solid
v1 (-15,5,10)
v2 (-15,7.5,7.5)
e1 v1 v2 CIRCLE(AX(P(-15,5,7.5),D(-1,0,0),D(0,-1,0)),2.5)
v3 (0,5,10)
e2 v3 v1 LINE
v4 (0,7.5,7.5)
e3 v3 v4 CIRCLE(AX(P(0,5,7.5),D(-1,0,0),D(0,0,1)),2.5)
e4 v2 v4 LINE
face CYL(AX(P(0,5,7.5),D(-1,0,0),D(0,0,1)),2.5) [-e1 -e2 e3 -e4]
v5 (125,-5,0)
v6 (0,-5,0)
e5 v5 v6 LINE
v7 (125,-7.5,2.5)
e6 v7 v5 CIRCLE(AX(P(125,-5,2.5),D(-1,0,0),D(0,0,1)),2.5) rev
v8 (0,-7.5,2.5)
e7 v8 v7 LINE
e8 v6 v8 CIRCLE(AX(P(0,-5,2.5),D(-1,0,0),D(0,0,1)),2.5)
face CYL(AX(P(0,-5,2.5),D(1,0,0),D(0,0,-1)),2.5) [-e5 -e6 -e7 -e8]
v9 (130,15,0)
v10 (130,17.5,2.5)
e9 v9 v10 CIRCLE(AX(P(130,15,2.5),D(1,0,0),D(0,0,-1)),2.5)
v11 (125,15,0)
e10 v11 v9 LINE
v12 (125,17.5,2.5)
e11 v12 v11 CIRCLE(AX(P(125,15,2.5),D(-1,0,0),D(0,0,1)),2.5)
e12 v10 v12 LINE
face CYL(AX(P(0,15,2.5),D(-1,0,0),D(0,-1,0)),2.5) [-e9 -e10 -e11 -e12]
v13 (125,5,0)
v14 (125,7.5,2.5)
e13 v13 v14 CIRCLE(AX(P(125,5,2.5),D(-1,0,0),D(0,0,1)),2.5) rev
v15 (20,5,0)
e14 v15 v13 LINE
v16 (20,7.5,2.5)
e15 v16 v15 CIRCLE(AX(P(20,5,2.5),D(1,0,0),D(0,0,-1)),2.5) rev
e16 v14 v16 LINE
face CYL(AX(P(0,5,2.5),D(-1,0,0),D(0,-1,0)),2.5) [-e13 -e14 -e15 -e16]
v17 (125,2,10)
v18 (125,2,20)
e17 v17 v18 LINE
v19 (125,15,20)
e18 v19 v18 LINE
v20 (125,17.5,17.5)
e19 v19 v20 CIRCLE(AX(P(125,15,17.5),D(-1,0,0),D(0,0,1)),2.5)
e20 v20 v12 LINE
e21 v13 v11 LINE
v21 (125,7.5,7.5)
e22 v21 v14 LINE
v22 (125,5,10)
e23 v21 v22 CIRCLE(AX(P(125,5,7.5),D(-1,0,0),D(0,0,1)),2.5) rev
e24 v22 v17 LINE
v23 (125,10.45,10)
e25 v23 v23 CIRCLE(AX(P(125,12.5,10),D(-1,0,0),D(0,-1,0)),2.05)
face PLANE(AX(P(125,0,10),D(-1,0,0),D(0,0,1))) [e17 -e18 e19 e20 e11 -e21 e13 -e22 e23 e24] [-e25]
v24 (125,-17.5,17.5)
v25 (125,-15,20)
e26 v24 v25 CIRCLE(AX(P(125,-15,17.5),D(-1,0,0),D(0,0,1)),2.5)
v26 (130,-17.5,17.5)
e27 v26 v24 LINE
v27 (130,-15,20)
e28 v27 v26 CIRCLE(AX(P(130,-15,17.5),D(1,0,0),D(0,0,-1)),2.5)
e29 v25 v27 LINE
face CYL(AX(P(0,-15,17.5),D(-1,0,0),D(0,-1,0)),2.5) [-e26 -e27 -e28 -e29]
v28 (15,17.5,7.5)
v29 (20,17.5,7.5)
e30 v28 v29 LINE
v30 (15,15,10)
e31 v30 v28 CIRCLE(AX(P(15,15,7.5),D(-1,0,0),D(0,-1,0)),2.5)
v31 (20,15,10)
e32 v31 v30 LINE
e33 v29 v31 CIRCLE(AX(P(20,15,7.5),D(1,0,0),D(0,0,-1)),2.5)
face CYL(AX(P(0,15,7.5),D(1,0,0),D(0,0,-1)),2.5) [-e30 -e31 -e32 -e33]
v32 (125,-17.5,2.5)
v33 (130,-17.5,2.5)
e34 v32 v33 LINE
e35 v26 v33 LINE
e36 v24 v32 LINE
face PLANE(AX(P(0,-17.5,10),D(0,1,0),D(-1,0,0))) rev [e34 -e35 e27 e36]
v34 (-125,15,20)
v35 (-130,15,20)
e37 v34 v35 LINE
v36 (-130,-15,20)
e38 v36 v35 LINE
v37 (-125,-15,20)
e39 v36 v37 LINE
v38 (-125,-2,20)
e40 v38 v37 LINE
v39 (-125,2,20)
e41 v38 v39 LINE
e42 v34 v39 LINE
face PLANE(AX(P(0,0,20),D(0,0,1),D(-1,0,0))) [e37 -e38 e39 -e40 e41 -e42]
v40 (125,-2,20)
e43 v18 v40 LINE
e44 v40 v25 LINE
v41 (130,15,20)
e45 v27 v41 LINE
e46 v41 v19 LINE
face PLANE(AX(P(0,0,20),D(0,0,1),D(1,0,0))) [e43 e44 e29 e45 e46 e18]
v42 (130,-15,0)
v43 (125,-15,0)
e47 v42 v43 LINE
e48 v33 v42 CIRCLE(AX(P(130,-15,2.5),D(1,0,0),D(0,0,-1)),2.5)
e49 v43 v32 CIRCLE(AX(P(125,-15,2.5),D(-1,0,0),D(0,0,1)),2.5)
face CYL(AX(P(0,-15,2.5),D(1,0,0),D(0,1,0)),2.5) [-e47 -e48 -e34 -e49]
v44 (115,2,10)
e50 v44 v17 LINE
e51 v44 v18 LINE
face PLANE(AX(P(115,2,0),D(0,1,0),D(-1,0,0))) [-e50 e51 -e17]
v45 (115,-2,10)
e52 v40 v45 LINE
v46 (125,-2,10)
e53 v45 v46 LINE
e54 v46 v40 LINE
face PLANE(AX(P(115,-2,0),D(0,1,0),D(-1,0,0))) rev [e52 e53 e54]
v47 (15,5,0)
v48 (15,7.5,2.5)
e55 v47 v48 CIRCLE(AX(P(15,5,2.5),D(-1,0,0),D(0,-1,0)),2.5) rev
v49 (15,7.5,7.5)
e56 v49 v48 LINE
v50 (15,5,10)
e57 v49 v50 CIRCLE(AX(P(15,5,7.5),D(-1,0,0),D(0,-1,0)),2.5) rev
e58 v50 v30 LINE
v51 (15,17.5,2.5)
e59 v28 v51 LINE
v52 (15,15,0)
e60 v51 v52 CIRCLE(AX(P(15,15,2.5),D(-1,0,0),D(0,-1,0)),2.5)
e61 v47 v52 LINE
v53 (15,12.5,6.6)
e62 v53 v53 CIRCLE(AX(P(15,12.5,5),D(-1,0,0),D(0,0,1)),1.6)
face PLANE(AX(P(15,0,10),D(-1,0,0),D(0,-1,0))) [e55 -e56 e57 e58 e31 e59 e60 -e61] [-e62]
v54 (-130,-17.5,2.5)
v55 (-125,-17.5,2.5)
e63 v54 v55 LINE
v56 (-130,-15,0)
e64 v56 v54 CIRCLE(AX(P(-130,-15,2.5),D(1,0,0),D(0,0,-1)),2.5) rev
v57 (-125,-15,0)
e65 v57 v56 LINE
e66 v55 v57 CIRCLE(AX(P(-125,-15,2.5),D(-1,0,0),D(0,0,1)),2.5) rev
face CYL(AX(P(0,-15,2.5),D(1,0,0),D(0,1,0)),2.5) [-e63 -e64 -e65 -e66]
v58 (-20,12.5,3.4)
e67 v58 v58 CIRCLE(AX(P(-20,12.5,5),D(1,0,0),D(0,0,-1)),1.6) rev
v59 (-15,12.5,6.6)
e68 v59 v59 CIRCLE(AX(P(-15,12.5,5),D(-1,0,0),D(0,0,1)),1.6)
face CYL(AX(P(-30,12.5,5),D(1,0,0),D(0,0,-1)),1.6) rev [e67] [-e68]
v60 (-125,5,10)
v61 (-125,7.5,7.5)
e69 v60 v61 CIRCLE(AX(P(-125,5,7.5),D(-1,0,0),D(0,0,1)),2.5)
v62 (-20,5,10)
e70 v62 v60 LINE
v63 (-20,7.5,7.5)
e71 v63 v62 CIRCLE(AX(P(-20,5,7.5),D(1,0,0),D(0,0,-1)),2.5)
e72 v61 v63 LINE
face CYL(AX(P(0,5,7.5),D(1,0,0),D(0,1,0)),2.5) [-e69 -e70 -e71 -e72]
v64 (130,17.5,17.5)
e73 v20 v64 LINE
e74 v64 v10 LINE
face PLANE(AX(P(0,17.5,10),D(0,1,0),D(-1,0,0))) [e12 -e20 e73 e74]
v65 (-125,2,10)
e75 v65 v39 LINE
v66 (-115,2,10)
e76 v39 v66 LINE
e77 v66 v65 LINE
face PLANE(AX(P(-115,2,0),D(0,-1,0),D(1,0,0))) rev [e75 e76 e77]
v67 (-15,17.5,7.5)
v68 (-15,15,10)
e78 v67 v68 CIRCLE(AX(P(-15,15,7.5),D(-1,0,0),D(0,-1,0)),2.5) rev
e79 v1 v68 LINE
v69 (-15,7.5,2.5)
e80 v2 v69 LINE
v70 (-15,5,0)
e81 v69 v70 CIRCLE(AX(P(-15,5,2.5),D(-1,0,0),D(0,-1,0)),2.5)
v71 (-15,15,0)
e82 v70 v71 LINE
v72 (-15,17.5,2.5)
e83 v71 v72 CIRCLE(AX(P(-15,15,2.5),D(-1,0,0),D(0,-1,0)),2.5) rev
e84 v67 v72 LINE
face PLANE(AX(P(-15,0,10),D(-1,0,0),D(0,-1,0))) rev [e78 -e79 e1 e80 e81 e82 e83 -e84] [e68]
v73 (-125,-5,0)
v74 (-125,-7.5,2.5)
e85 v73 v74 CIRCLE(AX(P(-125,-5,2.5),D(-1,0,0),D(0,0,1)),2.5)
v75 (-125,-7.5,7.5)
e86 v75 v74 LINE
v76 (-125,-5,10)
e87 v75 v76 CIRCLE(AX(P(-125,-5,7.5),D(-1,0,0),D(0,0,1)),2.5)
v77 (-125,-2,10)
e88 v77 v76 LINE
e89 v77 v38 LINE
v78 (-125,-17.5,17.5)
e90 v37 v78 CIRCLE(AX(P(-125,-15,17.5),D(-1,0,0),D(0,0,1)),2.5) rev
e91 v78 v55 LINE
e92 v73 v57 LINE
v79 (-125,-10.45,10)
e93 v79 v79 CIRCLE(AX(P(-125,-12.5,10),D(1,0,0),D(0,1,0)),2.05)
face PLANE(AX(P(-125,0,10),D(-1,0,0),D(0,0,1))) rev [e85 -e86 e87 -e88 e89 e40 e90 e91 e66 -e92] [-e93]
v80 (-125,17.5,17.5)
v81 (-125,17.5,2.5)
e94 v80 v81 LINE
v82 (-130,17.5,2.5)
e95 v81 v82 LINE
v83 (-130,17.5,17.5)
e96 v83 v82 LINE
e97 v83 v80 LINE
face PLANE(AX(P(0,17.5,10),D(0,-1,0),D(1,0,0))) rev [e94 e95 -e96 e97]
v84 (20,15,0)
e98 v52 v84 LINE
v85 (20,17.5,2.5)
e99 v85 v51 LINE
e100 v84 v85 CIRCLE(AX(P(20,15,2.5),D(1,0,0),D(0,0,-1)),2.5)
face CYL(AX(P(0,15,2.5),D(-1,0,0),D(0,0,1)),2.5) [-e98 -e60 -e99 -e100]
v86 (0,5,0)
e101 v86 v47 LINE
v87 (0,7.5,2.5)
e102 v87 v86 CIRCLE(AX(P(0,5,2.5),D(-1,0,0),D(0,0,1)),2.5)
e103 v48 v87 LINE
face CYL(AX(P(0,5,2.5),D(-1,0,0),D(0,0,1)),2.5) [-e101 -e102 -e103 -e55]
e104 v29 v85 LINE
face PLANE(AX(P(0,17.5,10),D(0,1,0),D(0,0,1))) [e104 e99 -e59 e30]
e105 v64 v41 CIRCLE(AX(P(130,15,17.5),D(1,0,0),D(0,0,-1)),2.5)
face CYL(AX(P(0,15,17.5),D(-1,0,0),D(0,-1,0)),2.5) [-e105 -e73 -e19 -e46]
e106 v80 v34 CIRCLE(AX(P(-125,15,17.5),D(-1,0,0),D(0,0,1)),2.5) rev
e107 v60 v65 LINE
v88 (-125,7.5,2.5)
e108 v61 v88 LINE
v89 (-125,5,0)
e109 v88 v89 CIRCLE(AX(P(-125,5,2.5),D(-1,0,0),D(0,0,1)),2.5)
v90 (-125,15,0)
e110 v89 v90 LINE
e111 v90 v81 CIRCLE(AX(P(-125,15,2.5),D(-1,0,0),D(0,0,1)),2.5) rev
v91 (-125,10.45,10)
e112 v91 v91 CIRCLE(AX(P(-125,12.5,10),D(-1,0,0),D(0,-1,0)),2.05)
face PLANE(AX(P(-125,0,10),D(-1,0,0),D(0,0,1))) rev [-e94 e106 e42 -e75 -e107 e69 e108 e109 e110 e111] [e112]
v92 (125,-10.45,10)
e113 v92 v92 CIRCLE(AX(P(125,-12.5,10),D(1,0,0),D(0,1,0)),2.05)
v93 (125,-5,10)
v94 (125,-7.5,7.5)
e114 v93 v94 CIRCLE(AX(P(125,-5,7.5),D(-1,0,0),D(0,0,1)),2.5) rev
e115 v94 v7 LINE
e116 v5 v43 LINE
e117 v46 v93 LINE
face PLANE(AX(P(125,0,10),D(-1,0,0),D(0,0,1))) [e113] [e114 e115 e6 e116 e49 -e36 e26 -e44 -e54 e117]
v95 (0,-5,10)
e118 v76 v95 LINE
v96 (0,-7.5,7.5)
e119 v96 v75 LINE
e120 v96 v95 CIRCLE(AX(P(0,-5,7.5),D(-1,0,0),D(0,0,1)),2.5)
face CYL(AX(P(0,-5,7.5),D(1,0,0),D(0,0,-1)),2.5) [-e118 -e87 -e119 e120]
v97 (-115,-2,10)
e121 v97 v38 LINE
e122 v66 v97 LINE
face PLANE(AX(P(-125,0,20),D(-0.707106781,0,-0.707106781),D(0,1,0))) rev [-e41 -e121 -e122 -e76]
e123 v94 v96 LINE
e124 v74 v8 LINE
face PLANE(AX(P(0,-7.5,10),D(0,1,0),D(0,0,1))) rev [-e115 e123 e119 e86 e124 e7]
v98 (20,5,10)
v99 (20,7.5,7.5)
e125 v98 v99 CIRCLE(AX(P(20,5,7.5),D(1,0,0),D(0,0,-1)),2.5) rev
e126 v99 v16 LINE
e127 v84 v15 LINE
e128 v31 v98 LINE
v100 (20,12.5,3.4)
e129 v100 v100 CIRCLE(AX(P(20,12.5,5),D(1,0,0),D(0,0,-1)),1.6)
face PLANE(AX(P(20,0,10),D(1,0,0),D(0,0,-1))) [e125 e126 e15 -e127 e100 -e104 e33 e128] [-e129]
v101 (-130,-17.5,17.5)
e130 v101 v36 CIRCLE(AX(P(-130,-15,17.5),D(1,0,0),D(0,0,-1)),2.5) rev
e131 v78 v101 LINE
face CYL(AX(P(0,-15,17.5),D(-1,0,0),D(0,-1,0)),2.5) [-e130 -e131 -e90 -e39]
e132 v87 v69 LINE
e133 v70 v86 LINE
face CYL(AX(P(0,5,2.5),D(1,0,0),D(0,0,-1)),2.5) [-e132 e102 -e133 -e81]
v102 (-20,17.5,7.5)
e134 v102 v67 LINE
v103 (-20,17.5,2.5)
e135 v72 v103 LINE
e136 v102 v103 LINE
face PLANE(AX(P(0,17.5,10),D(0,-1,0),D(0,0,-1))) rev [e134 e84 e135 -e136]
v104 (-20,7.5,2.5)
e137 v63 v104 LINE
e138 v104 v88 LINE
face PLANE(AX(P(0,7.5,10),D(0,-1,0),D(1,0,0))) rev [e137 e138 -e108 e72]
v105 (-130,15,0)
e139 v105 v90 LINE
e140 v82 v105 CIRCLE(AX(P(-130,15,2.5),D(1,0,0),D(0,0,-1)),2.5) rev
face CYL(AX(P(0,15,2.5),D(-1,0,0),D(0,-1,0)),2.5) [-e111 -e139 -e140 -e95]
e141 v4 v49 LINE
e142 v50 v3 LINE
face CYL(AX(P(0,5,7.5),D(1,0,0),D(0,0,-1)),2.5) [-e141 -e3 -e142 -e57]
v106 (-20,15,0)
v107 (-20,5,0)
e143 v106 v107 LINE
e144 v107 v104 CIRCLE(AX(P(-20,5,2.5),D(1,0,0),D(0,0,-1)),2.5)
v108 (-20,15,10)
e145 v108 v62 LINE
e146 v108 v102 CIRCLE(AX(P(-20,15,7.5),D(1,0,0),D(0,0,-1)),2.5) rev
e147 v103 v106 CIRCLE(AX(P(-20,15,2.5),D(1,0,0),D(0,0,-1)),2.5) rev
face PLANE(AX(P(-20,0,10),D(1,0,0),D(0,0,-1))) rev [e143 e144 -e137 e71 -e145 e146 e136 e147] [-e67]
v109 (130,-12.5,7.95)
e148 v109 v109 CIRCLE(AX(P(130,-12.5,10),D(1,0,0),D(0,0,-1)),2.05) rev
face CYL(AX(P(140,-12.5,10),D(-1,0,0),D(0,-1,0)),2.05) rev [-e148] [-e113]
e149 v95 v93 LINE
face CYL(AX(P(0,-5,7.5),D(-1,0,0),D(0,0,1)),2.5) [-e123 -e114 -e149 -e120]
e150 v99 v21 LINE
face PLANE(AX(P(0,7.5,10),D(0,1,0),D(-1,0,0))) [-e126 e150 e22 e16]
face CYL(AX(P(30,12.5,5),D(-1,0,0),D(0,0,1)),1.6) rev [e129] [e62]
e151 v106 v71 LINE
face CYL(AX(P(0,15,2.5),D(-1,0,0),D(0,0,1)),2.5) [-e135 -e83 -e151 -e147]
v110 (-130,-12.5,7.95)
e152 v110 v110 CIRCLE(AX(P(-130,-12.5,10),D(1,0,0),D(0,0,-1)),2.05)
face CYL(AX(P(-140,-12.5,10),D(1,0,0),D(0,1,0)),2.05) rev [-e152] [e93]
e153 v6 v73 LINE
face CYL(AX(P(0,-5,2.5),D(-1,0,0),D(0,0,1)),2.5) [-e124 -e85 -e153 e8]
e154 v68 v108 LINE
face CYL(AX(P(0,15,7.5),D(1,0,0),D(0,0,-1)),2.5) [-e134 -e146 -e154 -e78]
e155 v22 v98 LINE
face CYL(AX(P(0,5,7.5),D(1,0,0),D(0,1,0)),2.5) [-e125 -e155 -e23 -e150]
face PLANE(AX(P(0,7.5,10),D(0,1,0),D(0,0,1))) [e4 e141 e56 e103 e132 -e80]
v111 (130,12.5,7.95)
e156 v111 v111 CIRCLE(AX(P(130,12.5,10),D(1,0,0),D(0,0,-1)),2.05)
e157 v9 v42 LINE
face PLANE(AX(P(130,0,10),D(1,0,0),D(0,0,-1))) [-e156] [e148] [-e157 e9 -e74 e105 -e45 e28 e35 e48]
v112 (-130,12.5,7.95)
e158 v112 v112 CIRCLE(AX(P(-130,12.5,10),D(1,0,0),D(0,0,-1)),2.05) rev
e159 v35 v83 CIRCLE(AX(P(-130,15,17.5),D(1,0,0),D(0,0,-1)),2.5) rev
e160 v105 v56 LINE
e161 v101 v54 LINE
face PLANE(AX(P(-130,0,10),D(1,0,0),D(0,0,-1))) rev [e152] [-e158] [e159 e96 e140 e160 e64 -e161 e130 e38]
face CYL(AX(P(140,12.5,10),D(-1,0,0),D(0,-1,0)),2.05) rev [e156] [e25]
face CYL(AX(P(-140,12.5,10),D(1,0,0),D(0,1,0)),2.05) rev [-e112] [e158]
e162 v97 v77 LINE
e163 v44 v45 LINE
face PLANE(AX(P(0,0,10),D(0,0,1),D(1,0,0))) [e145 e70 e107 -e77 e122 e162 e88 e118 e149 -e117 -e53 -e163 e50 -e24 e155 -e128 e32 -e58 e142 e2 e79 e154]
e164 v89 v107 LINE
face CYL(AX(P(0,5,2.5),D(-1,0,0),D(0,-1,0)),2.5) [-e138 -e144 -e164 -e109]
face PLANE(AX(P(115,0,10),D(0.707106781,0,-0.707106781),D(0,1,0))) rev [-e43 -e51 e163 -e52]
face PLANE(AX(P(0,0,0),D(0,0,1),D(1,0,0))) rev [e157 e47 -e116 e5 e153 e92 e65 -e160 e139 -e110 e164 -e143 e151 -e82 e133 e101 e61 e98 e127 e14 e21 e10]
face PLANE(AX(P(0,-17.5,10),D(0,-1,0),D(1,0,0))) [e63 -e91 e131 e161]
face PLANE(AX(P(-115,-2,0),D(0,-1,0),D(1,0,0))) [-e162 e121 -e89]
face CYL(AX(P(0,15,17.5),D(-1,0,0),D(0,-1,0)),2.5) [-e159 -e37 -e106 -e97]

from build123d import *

# Parameters (mm, degrees)
BOSS_EXTRU_1_DEPTH           = 10
BOSS_EXTRU_2_DEPTH           = 10
ESQUISSE4_R                  = 1.6
ENL_V_MAT_EXTRU_1_DEPTH      = 15
ESQUISSE5_R                  = 2.05
ENL_V_MAT_EXTRU_2_DEPTH      = 15
CONG_1_R                     = 2.5
ESQUISSE6_W                  = 10
ESQUISSE6_H                  = 2
BOSS_EXTRU_3_DEPTH           = 10
CHANFREIN1_SIZE              = 10
CONG_1_OF_SYM_TRIE1_R        = 2.5
CHANFREIN1_OF_SYM_TRIE1_SIZE = 10


with BuildPart() as part:
    # Esquisse2 → Boss.-Extru.1 (new body)
    with BuildSketch(Plane.XY):
        Polygon((125, 17.5), (125, 7.5), (20, 7.5), (20, 17.5), (15, 17.5), (15, 7.5), (0, 7.5), (0, -7.5), (125, -7.5), (125, -17.5), (130, -17.5), (130, 17.5), align=None)
    boss_extru_1 = extrude(amount=BOSS_EXTRU_1_DEPTH)

    # Esquisse3 → Boss.-Extru.2 (add)
    with BuildSketch(Plane.XY.offset(10)):
        Polygon((125, 7.5), (125, -7.5), (125, -17.5), (130, -17.5), (130, 17.5), (125, 17.5), align=None)
    boss_extru_2 = extrude(amount=BOSS_EXTRU_2_DEPTH)

    # Esquisse4 → Enlèv. mat.-Extru.1 (cut)
    with BuildSketch(Plane.ZY.offset(-15)):
        with Locations((5, 12.5)):
            Circle(ESQUISSE4_R)
    enl_v_mat_extru_1 = extrude(amount=-ENL_V_MAT_EXTRU_1_DEPTH, mode=Mode.SUBTRACT)

    # Esquisse5 → Enlèv. mat.-Extru.2 (cut)
    with BuildSketch(Plane.ZY.offset(-125)):
        with Locations(Location((10, 12.5, 0), (0, 0, 270))):
            Circle(ESQUISSE5_R)
        with Locations(Location((10, -12.5, 0), (0, 0, 180))):
            Circle(ESQUISSE5_R)
    enl_v_mat_extru_2 = extrude(amount=-ENL_V_MAT_EXTRU_2_DEPTH, mode=Mode.SUBTRACT)

    # Congé1
    cong_1_edges = [part.edges().sort_by_distance(p)[0] for p in [
        (127.5, 17.5, 0),
        (17.5, 17.5, 10),
        (127.5, -17.5, 0),
        (62.5, -7.5, 0),
        (7.5, 7.5, 0),
        (17.5, 17.5, 0),
        (72.5, 7.5, 0),
        (7.5, 7.5, 10),
        (62.5, -7.5, 10),
        (127.5, -17.5, 20),
        (127.5, 17.5, 20),
        (72.5, 7.5, 10),
    ]]
    fillet(cong_1_edges, radius=CONG_1_R)

    # Esquisse6 → Boss.-Extru.3 (add)
    with BuildSketch(Plane.ZY.offset(-125)):
        with Locations((15, 1)):
            Rectangle(ESQUISSE6_W, ESQUISSE6_H)
        with Locations((15, -1)):
            Rectangle(ESQUISSE6_W, ESQUISSE6_H)
    boss_extru_3 = extrude(amount=BOSS_EXTRU_3_DEPTH)

    # Chanfrein1
    chanfrein1_edges = [part.edges().sort_by_distance(p)[0] for p in [
        (115, 0, 20),
    ]]
    chamfer(chanfrein1_edges, length=CHANFREIN1_SIZE - 0.0001)  # a hair under: the kernel refuses the full size

    # Symétrie1: Boss.-Extru.1, Boss.-Extru.2, Enlèv. mat.-Extru.1, Enlèv. mat.-Extru.2, Boss.-Extru.3 across plane
    add(boss_extru_1.mirror(Plane(origin=(0, 0, 0), x_dir=(0, 0, 1), z_dir=(1, 0, 0))))
    add(boss_extru_2.mirror(Plane(origin=(0, 0, 0), x_dir=(0, 0, 1), z_dir=(1, 0, 0))))
    add(enl_v_mat_extru_1.mirror(Plane(origin=(0, 0, 0), x_dir=(0, 0, 1), z_dir=(1, 0, 0))), mode=Mode.SUBTRACT)
    add(enl_v_mat_extru_2.mirror(Plane(origin=(0, 0, 0), x_dir=(0, 0, 1), z_dir=(1, 0, 0))), mode=Mode.SUBTRACT)
    add(boss_extru_3.mirror(Plane(origin=(0, 0, 0), x_dir=(0, 0, 1), z_dir=(1, 0, 0))))

    # Congé1 of Symétrie1
    cong_1_of_sym_trie1_edges = [part.edges().sort_by_distance(p)[0] for p in [
        (-127.5, 17.5, 0),
        (-17.5, 17.5, 10),
        (-127.5, -17.5, 0),
        (-62.5, -7.5, 0),
        (-7.5, 7.5, 0),
        (-17.5, 17.5, 0),
        (-72.5, 7.5, 0),
        (-7.5, 7.5, 10),
        (-62.5, -7.5, 10),
        (-127.5, -17.5, 20),
        (-127.5, 17.5, 20),
        (-72.5, 7.5, 10),
    ]]
    fillet(cong_1_of_sym_trie1_edges, radius=CONG_1_OF_SYM_TRIE1_R)

    # Chanfrein1 of Symétrie1
    chanfrein1_of_sym_trie1_edges = [part.edges().sort_by_distance(p)[0] for p in [
        (-115, 0, 20),
    ]]
    chamfer(chanfrein1_of_sym_trie1_edges, length=CHANFREIN1_OF_SYM_TRIE1_SIZE - 0.0001)  # a hair under: the kernel refuses the full size


solid = part.part
